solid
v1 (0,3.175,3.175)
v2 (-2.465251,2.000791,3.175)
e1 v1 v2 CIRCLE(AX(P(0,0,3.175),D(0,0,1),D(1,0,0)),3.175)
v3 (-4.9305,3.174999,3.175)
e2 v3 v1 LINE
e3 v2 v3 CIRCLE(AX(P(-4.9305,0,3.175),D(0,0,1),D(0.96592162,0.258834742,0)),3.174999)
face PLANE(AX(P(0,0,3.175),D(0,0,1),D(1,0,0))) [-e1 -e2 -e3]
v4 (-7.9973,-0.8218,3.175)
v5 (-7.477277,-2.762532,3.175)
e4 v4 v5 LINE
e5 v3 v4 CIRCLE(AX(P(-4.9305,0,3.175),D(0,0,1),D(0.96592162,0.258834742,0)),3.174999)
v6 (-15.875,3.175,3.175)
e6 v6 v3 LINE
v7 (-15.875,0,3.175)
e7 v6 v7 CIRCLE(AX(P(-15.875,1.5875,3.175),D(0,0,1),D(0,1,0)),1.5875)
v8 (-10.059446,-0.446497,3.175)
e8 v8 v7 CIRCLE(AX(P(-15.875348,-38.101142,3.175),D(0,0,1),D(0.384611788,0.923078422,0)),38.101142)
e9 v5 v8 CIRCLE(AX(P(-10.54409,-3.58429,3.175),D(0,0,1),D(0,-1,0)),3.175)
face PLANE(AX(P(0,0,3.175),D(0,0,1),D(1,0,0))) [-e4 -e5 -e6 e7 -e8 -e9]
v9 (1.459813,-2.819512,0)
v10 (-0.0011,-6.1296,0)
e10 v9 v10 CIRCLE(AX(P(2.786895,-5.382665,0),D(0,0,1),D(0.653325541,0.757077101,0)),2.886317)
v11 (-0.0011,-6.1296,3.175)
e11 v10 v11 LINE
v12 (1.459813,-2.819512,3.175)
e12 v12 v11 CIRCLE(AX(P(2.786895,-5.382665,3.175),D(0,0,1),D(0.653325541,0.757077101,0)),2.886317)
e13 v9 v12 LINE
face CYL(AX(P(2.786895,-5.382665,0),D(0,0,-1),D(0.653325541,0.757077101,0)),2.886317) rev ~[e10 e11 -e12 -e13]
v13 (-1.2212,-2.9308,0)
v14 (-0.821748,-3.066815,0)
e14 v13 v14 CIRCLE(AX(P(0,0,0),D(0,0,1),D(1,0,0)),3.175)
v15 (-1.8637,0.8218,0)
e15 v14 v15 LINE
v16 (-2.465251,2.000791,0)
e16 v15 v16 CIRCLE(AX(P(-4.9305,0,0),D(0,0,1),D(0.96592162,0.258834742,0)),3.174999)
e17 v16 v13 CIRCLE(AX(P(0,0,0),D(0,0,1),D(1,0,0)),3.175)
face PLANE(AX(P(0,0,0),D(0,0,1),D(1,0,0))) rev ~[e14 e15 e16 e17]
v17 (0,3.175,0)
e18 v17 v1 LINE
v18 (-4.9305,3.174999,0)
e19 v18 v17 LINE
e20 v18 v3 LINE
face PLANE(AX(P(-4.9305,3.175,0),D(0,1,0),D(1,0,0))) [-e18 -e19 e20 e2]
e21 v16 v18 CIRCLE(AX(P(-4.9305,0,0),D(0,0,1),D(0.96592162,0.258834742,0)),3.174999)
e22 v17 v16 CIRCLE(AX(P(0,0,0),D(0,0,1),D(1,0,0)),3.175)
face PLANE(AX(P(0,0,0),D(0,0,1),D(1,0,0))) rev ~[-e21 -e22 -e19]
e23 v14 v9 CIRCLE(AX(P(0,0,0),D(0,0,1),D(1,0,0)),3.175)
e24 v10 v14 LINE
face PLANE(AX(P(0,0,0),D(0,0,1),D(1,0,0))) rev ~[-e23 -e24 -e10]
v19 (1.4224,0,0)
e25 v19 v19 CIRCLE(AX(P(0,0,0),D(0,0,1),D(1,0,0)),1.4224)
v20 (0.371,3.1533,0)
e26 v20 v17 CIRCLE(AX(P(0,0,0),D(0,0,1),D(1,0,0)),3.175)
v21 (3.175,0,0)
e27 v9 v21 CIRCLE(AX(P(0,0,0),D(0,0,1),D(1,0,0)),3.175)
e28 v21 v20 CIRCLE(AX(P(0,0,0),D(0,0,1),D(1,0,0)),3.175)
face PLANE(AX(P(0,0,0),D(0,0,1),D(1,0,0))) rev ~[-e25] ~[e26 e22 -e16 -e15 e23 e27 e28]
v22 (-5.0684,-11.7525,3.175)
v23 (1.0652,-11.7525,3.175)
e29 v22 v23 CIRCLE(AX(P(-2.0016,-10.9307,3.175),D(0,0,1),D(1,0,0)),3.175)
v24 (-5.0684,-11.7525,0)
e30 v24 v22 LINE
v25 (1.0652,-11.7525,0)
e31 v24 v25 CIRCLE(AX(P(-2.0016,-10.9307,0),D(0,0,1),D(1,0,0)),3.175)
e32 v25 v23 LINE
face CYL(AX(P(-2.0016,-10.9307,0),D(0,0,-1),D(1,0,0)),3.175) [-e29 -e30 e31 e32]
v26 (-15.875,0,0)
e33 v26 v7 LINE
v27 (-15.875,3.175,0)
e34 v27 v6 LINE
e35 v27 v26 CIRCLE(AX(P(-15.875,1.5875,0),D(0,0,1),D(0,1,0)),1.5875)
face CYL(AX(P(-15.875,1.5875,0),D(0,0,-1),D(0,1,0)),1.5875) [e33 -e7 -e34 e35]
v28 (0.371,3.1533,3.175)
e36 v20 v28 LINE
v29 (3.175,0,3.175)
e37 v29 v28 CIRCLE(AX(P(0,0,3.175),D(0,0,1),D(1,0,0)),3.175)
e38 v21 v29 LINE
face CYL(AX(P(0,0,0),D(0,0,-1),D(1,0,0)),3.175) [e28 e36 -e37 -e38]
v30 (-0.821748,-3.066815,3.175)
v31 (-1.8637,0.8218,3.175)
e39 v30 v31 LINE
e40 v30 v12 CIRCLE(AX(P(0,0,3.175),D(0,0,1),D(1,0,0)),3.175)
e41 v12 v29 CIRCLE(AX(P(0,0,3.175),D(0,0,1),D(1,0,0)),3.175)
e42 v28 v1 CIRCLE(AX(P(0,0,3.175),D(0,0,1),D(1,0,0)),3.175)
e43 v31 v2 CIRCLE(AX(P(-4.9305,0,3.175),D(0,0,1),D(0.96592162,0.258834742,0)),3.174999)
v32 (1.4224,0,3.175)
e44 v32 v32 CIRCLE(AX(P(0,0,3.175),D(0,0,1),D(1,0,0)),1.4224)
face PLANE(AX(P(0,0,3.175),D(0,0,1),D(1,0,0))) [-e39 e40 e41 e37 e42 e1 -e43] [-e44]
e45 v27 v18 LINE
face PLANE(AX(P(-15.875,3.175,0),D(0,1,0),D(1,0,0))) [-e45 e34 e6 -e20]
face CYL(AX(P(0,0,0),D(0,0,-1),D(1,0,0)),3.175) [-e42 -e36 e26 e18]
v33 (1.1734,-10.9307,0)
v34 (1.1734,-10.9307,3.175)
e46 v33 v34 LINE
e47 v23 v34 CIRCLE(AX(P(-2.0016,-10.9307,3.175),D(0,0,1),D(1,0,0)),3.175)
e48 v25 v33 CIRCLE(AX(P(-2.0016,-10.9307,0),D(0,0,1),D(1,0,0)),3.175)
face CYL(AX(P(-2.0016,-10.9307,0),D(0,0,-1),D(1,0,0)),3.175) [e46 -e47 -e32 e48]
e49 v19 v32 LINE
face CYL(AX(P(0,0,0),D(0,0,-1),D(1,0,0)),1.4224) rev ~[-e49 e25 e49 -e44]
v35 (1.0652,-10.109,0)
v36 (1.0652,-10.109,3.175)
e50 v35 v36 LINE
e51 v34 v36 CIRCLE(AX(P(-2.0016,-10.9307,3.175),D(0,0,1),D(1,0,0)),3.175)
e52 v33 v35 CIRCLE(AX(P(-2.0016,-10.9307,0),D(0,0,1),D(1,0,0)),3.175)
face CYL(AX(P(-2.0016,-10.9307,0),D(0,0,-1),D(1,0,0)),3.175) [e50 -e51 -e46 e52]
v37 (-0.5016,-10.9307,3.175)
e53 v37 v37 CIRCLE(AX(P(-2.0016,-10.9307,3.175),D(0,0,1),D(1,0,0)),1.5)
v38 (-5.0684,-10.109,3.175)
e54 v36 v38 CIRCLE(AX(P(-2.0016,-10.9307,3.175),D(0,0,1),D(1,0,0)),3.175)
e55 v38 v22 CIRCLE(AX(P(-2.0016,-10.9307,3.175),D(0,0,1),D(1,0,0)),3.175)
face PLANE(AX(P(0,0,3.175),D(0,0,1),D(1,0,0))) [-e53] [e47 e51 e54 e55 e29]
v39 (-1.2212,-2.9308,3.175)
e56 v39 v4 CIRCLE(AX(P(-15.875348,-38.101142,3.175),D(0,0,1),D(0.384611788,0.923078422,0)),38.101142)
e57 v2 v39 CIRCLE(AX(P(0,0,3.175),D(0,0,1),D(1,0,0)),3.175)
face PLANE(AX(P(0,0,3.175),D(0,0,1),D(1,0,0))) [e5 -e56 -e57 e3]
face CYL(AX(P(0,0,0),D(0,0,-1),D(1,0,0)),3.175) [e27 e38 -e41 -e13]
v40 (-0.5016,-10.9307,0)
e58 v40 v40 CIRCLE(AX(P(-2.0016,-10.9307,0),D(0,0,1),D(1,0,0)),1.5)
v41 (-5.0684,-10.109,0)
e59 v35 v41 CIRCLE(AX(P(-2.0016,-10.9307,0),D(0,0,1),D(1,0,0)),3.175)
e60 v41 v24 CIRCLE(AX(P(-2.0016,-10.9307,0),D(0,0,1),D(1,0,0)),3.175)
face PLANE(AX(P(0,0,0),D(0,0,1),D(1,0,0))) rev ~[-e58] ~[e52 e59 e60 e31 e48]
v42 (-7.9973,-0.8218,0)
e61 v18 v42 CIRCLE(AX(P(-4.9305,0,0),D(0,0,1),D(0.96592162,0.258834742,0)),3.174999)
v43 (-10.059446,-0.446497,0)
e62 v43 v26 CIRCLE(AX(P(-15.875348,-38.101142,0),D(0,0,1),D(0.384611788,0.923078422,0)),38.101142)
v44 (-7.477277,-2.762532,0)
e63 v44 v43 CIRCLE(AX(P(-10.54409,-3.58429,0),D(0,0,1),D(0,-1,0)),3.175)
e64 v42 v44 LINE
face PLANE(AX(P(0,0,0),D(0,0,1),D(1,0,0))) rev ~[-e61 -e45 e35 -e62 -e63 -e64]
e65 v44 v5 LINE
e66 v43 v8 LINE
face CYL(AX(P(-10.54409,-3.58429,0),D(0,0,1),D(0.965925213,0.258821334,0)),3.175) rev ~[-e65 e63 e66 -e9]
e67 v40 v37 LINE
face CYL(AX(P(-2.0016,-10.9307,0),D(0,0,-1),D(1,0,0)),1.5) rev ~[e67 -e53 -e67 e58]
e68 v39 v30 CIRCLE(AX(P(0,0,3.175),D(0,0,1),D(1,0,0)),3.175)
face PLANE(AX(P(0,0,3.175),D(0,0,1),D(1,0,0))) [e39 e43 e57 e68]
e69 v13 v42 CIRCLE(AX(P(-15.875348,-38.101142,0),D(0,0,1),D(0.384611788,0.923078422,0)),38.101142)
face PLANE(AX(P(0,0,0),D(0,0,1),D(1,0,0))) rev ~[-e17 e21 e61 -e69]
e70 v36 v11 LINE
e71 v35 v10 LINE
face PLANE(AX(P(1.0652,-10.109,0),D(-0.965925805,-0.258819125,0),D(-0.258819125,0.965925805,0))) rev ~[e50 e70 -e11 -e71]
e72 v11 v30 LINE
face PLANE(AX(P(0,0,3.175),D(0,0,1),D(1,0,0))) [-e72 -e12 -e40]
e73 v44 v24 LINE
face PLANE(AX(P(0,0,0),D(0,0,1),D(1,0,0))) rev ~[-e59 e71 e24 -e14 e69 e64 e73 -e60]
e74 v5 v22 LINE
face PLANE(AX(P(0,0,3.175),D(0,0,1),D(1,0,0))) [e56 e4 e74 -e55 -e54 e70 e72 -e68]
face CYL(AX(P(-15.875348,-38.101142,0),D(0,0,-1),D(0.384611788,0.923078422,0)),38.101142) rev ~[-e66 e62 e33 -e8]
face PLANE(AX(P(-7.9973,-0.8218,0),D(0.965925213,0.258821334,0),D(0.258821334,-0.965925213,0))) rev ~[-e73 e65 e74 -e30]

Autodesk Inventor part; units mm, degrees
ref_plane "YZ Plane" through (0, 0, 0) normal (1, 0, 0) x (0, 1, 0)
ref_plane "XZ Plane" through (0, 0, 0) normal (0, 1, 0) x (-1, 0, 0)
ref_plane "XY Plane" through (0, 0, 0) normal (0, 0, 1) x (1, 0, 0)
sketch "Sketch1" plane through (0, 0, 0) normal (0, 0, 1) x (1, 0, 0)
  circle A0 centre (0, 0) radius 1.4224
  circle A1 centre (0, 0) radius 3.175
  line L0 (0, 0) -> (-15.875, 0) construction
  circle A2 centre (-2.0016, -10.9307) radius 3.175
  circle A3 centre (-2.0016, -10.9307) radius 5 construction
  circle A4 centre (-2.0016, -10.9307) radius 1.5
  line L1 (0, 0) -> (-2.0016, -10.9307) construction
  line L2 (-2.0016, -10.9307) -> (-3.4771, -10.6606) construction
  line L3 (0, 0) -> (-2.0016, -10.9307) construction
  arc A5 (-5.0684, -10.109) -> (1.0652, -11.7525) centre (-2.0016, -10.9307) ccw
  arc A6 (-1.2212, -2.9308) -> (-15.875, 0) centre (-15.875, -38.1) ccw
  arc A7 (-15.875, 3.175) -> (-15.875, 0) centre (-15.875, 1.5875) ccw
  line L4 (-15.875, 3.175) -> (0, 3.175)
  line L5 (-2.0016, -10.9307) -> (-4.9305, 0) construction
  line L6 (1.0652, -10.109) -> (-1.8637, 0.8218)
  line L7 (-7.9973, -0.8218) -> (-5.0684, -11.7525)
  arc A8 (-5.0684, -11.7525) -> (1.0652, -10.109) centre (-2.0016, -10.9307) ccw
  arc A9 (-1.8637, 0.8218) -> (-7.9973, -0.8218) centre (-4.9305, 0) ccw
  circle A10 centre (6.7469, -0.7937) radius 3.175
  circle A11 centre (6.7469, -0.7937) radius 1.5
  line L8 (7.1178, 2.3595) -> (0.371, 3.1533)
  arc A12 (4.6726, -3.1975) -> (-0.0011, -6.1296) centre (2.7869, -5.3826) ccw
  circle A13 centre (6.7469, -0.7937) radius 5 construction
  point P0 (-5.0684, -10.109)
  point P1 (0, 3.175)
  point P2 (-7.9969, -0.8234)
  point P3 (1.0652, -10.109)
  point P4 (-0.8218, -3.0668)
  point P5 (-2.4653, 2.0008)
  point P6 (0.6312, -3.1116)
  point P7 (1.4598, -2.8195)
  point P8 (-1.4243, -1.0642)
  point P9 (-1.7024, 0.5129)
  point P10 (1.0652, -10.109)
  point P11 (-5.0684, -11.7525)
  dimension "d24" = 3
  dimension "d0" = 2.8448
  dimension "d1" = 6.35
  dimension "d9" = 15.875
  dimension "d22" = 6.35
  dimension "d23" = 10
  dimension "d26" = 11.1125
  dimension "d29" = 3.175
  dimension "d30" = 6.35
  dimension "d31" = 6.35
  dimension "d32" = 3
  dimension "d36" = 10
  dimension "d37" = 105
  dimension "d38" = 4.7625
  dimension "d39" = 6.7469
  dimension "d40" = 0.7937
extrude "Extrusion1" add sketch "Sketch1" along normal blind 3.175 contours A1 L6 A9 | A12 L6 A1 | A1 A9 L4 | L6 A2 L7 A6 A1 | A1 A9 L6 | A1 A6 A9 | A9 A6 A7 L4 | A2
fillet "Fillet1" radius 3.175 1 edges at (-7.9969, -0.8234, 1.5875)
properties part number "Lever" material "Aluminum 6061"
